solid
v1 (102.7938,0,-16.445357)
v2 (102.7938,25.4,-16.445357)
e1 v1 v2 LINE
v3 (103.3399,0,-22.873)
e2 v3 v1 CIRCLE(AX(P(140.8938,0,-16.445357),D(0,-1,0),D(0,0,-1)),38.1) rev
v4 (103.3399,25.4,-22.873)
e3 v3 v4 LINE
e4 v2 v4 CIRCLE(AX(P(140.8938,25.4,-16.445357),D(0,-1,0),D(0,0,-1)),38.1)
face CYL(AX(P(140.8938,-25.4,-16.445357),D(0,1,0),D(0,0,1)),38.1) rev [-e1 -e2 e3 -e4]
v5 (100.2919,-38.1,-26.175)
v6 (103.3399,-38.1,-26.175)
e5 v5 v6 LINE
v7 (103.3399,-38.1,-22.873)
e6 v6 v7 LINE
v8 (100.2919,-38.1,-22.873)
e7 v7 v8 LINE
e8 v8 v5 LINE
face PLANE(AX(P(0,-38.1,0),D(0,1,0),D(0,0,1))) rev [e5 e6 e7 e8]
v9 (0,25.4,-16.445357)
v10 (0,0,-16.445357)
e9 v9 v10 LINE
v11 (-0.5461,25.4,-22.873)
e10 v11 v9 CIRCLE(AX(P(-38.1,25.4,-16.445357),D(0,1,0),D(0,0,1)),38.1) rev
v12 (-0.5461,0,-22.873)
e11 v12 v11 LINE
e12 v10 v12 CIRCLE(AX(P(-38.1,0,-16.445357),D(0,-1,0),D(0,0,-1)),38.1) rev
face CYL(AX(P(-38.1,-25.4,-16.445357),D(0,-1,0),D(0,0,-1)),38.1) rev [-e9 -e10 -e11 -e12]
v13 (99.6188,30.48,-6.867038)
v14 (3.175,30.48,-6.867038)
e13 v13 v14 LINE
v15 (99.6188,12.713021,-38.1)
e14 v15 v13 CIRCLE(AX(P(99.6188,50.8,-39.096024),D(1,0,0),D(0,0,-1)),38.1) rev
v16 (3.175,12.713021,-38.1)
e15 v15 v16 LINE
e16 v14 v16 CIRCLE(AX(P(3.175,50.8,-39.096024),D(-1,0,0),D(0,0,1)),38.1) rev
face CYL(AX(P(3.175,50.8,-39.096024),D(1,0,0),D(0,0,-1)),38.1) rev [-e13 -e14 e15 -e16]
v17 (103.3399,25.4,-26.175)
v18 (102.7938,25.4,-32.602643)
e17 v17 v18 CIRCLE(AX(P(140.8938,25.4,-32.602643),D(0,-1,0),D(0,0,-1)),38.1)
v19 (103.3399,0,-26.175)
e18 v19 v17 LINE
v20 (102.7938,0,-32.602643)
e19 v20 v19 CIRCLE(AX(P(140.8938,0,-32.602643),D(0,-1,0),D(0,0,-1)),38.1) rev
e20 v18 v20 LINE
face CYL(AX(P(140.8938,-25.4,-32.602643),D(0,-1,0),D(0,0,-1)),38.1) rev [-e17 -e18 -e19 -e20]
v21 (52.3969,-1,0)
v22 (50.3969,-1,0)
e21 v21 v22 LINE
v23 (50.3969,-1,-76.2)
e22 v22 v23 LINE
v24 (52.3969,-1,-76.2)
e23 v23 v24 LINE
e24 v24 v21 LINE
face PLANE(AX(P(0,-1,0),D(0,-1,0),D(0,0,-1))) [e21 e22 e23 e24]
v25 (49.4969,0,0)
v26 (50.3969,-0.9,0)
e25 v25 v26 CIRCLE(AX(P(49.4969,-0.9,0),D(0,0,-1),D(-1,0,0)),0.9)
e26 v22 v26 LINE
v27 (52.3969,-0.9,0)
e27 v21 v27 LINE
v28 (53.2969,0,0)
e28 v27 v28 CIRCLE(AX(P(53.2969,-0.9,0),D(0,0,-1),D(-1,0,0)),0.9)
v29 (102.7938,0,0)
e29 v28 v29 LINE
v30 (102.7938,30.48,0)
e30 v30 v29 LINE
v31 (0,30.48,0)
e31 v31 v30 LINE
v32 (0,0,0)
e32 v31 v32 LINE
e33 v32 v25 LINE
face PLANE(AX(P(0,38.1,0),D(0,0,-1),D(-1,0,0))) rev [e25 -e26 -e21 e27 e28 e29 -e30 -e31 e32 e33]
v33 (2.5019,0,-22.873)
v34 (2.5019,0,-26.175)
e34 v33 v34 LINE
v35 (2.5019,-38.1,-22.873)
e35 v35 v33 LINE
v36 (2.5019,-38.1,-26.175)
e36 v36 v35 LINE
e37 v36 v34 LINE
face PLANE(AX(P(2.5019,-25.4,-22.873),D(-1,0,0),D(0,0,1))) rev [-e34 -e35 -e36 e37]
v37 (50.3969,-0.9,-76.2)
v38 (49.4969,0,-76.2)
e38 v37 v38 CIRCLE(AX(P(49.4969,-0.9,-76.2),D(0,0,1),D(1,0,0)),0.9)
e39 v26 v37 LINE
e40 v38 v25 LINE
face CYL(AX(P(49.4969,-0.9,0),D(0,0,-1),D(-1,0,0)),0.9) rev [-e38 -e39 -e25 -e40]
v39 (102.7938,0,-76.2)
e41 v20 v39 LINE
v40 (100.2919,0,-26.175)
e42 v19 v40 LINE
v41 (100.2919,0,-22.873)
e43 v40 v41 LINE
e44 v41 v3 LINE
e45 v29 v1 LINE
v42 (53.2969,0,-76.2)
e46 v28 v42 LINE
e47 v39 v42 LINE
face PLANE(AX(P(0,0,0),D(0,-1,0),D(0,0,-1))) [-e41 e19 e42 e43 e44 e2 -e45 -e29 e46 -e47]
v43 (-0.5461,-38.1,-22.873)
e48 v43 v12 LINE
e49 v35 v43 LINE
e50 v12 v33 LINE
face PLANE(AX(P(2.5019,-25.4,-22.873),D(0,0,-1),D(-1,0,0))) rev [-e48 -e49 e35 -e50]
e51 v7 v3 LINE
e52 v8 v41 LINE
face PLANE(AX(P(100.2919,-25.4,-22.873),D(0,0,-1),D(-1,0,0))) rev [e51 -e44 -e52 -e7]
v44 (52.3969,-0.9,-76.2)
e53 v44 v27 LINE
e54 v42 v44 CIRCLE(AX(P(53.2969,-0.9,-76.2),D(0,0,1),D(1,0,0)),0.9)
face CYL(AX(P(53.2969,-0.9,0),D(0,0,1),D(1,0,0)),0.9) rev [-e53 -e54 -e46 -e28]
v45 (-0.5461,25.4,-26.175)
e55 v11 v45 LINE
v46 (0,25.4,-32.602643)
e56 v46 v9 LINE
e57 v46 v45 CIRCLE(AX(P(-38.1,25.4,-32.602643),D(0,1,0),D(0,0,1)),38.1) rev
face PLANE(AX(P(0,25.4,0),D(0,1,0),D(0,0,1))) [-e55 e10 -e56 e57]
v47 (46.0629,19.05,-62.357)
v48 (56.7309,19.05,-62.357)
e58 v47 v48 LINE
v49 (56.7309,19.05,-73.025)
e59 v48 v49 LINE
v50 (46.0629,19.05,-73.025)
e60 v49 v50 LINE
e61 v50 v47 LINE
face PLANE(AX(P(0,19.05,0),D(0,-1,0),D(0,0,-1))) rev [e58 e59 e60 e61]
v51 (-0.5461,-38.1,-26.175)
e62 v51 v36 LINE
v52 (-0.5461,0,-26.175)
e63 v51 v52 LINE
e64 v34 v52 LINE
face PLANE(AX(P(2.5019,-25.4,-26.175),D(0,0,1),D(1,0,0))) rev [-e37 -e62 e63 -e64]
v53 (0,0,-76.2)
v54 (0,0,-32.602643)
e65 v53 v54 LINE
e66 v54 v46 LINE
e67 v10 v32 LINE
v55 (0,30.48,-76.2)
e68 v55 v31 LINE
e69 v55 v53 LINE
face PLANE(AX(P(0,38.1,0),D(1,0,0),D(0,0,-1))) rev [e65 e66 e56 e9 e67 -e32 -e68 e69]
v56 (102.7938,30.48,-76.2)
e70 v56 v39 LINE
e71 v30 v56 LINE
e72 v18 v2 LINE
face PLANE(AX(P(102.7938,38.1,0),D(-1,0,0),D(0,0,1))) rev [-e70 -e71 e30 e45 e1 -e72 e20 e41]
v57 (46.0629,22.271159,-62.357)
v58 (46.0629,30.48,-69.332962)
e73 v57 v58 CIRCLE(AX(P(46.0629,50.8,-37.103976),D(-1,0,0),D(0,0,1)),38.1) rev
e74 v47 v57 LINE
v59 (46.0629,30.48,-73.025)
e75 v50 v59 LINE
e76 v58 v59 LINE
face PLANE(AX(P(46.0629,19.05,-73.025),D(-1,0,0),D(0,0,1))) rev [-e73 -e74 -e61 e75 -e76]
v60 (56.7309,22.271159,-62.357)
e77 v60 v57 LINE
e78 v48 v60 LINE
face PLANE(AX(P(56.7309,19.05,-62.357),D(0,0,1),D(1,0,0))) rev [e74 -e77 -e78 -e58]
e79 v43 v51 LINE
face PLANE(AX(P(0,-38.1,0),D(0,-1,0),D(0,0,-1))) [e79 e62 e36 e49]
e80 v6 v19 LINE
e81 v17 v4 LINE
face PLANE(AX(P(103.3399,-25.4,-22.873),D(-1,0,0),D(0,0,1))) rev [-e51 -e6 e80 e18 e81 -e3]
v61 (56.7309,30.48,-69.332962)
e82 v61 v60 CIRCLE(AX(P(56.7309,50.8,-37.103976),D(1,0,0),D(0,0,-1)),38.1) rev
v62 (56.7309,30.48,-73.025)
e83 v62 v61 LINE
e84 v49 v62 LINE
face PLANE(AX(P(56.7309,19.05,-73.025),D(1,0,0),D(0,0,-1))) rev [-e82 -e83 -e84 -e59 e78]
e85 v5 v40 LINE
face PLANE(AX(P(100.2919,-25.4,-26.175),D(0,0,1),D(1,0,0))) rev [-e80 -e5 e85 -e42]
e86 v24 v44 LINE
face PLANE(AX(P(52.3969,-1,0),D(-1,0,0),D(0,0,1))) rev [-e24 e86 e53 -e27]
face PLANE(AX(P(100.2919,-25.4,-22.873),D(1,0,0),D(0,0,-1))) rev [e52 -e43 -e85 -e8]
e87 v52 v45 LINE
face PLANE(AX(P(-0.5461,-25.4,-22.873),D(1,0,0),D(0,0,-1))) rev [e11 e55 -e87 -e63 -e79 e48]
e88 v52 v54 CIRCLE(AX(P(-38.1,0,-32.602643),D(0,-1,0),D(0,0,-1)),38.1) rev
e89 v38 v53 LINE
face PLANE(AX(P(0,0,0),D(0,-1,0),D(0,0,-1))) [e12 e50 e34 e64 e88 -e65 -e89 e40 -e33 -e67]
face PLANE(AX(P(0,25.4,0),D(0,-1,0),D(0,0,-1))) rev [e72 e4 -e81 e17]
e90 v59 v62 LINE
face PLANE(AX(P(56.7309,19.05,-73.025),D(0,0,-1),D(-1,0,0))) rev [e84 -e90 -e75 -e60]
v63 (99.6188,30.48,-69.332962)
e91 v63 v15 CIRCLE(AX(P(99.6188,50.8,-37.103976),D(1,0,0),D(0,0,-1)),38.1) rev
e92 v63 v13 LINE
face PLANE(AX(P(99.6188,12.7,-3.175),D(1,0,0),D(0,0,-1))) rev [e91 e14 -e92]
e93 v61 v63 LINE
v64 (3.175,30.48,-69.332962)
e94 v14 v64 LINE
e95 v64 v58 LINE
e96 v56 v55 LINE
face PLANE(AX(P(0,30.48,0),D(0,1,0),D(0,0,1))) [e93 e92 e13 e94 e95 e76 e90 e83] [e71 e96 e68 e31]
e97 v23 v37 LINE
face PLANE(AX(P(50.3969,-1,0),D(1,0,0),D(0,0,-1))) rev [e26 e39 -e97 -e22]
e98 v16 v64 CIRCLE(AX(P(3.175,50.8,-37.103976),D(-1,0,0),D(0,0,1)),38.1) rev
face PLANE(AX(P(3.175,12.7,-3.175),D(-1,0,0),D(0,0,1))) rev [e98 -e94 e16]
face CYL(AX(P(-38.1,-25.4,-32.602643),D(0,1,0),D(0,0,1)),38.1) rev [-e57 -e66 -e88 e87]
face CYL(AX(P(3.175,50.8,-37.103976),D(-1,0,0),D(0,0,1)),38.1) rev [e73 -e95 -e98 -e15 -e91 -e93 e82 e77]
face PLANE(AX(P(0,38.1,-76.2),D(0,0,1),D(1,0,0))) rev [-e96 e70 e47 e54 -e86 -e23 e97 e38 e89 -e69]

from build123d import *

# Parameters (mm, degrees)
SKETCH1_W           = 102.7938
SKETCH1_H           = 76.2
BOSS_EXTRUDE1_DEPTH = 38.1
SKETCH2_W           = 96.4438
SKETCH2_H           = 69.85
CUT_EXTRUDE1_DEPTH  = 25.4
SKETCH3_W           = 3.048
SKETCH3_H           = 3.302
BOSS_EXTRUDE2_DEPTH = 25.4
FILLET1_R           = 38.1
SKETCH8_W           = 10.668
SKETCH8_H           = 10.668
CUT_EXTRUDE3_DEPTH  = 19.05
SKETCH7_W           = 102.7938
SKETCH7_H           = 76.2
CUT_EXTRUDE4_DEPTH  = 7.62
FILLET2_R           = 38.1
SKETCH9_W           = 3.048
SKETCH9_H           = 3.302
BOSS_EXTRUDE3_DEPTH = 12.7
SKETCH10_W          = 2
SKETCH10_H          = 76.2
BOSS_EXTRUDE4_DEPTH = 1
FILLET3_R           = 0.9


with BuildPart() as part:
    # Sketch1 → Boss-Extrude1 (new body)
    with BuildSketch(Plane(origin=(0, 0, 0), x_dir=(1, 0, 0), z_dir=(0, 1, 0))):
        with Locations((51.3969, 38.1)):
            Rectangle(SKETCH1_W, SKETCH1_H)
    extrude(amount=BOSS_EXTRUDE1_DEPTH)

    # Sketch2 → Cut-Extrude1 (cut)
    with BuildSketch(Plane(origin=(0, 38.1, 0), x_dir=(1, 0, 0), z_dir=(0, 1, 0))):
        with Locations((51.3969, 38.1)):
            Rectangle(SKETCH2_W, SKETCH2_H)
    extrude(amount=-CUT_EXTRUDE1_DEPTH, mode=Mode.SUBTRACT)

    # Sketch3 → Boss-Extrude2 (add, symmetric)
    with BuildSketch(Plane.XZ):
        with Locations((0.9779, -24.524)):
            Rectangle(SKETCH3_W, SKETCH3_H)
        with Locations((101.8159, -24.524)):
            Rectangle(SKETCH3_W, SKETCH3_H)
    extrude(amount=BOSS_EXTRUDE2_DEPTH, both=True)

    # Fillet1
    # the kernel refuses this fillet: 38.1 mm, written as the material it adds along each edge
    with BuildSketch(Plane(origin=(3.175, 12.7, -3.175), x_dir=(0, 1, 0), z_dir=(1, 0, 0)), Plane(origin=(99.6188, 12.7, -73.025), x_dir=(0, 1, 0), z_dir=(-1, 0, 0))) as fillet1_piece_1:
        with BuildLine():
            CenterArc((38.1, -35.921024484), FILLET1_R, 109.471220634, 70.528779366)
            Line((0, -35.921024484), (-0.762, -35.921024484))
            Line((-0.762, -35.921024484), (-0.762, 0))
            Line((-0.762, 0), (0, 0.762))
            ThreePointArc((0, 0.762), (12.7, 0.762), (25.146, 0.71842049))
            Line((25.146, 0.71842049), (25.4, 0))
        make_face()
    extrude(amount=96.4438)

    # Sketch8 → Cut-Extrude3 (cut)
    with BuildSketch(Plane(origin=(0, 38.1, 0), x_dir=(1, 0, 0), z_dir=(0, 1, 0))):
        with Locations((51.3969, 67.691)):
            Rectangle(SKETCH8_W, SKETCH8_H)
    extrude(amount=-CUT_EXTRUDE3_DEPTH, mode=Mode.SUBTRACT)

    # Sketch7 → Cut-Extrude4 (cut)
    with BuildSketch(Plane(origin=(0, 38.1, 0), x_dir=(1, 0, 0), z_dir=(0, 1, 0))):
        with Locations((51.3969, 38.1)):
            Rectangle(SKETCH7_W, SKETCH7_H)
    extrude(amount=-CUT_EXTRUDE4_DEPTH, mode=Mode.SUBTRACT)

    # Fillet2
    # the kernel refuses this fillet: 38.1 mm, written as the material it adds along each edge
    with BuildSketch(Plane(origin=(0, 25.4, -22.873), x_dir=(0, 0, 1), z_dir=(0, -1, 0)), Plane(origin=(0, 0, -26.175), x_dir=(0, 0, -1), z_dir=(0, 1, 0))) as fillet2_piece_1:
        with BuildLine():
            CenterArc((6.42764302, 38.1), FILLET2_R, 260.287493111, 9.712506889)
            Line((0, 0.5461), (0, 0))
            Line((0, 0), (6.42764302, 0))
        make_face()
    extrude(amount=25.4)
    with BuildSketch(Plane(origin=(102.7938, 0, -26.175), x_dir=(0, 0, -1), z_dir=(0, 1, 0)), Plane(origin=(102.7938, 25.4, -22.873), x_dir=(0, 0, 1), z_dir=(0, -1, 0))) as fillet2_piece_2:
        with BuildLine():
            CenterArc((6.42764302, -38.1), FILLET2_R, 90, 9.712506889)
            Line((0, -0.5461), (0, 0))
            Line((0, 0), (6.42764302, 0))
        make_face()
    extrude(amount=25.4)

    # Sketch9 → Boss-Extrude3 (add)
    with BuildSketch(Plane.XZ.offset(25.4)):
        with Locations((0.9779, -24.524)):
            Rectangle(SKETCH9_W, SKETCH9_H)
        with Locations((101.8159, -24.524)):
            Rectangle(SKETCH9_W, SKETCH9_H)
    extrude(amount=BOSS_EXTRUDE3_DEPTH)

    # Sketch10 → Boss-Extrude4 (add)
    with BuildSketch(Plane.XZ):
        with Locations((51.3969, -38.1)):
            Rectangle(SKETCH10_W, SKETCH10_H)
    extrude(amount=BOSS_EXTRUDE4_DEPTH)

    # Fillet3
    fillet3_edges = [part.edges().sort_by_distance(p)[0] for p in [
        (50.3969, 0, -38.1),
        (52.3969, 0, -38.1),
    ]]
    fillet(fillet3_edges, radius=FILLET3_R)


solid = part.part
